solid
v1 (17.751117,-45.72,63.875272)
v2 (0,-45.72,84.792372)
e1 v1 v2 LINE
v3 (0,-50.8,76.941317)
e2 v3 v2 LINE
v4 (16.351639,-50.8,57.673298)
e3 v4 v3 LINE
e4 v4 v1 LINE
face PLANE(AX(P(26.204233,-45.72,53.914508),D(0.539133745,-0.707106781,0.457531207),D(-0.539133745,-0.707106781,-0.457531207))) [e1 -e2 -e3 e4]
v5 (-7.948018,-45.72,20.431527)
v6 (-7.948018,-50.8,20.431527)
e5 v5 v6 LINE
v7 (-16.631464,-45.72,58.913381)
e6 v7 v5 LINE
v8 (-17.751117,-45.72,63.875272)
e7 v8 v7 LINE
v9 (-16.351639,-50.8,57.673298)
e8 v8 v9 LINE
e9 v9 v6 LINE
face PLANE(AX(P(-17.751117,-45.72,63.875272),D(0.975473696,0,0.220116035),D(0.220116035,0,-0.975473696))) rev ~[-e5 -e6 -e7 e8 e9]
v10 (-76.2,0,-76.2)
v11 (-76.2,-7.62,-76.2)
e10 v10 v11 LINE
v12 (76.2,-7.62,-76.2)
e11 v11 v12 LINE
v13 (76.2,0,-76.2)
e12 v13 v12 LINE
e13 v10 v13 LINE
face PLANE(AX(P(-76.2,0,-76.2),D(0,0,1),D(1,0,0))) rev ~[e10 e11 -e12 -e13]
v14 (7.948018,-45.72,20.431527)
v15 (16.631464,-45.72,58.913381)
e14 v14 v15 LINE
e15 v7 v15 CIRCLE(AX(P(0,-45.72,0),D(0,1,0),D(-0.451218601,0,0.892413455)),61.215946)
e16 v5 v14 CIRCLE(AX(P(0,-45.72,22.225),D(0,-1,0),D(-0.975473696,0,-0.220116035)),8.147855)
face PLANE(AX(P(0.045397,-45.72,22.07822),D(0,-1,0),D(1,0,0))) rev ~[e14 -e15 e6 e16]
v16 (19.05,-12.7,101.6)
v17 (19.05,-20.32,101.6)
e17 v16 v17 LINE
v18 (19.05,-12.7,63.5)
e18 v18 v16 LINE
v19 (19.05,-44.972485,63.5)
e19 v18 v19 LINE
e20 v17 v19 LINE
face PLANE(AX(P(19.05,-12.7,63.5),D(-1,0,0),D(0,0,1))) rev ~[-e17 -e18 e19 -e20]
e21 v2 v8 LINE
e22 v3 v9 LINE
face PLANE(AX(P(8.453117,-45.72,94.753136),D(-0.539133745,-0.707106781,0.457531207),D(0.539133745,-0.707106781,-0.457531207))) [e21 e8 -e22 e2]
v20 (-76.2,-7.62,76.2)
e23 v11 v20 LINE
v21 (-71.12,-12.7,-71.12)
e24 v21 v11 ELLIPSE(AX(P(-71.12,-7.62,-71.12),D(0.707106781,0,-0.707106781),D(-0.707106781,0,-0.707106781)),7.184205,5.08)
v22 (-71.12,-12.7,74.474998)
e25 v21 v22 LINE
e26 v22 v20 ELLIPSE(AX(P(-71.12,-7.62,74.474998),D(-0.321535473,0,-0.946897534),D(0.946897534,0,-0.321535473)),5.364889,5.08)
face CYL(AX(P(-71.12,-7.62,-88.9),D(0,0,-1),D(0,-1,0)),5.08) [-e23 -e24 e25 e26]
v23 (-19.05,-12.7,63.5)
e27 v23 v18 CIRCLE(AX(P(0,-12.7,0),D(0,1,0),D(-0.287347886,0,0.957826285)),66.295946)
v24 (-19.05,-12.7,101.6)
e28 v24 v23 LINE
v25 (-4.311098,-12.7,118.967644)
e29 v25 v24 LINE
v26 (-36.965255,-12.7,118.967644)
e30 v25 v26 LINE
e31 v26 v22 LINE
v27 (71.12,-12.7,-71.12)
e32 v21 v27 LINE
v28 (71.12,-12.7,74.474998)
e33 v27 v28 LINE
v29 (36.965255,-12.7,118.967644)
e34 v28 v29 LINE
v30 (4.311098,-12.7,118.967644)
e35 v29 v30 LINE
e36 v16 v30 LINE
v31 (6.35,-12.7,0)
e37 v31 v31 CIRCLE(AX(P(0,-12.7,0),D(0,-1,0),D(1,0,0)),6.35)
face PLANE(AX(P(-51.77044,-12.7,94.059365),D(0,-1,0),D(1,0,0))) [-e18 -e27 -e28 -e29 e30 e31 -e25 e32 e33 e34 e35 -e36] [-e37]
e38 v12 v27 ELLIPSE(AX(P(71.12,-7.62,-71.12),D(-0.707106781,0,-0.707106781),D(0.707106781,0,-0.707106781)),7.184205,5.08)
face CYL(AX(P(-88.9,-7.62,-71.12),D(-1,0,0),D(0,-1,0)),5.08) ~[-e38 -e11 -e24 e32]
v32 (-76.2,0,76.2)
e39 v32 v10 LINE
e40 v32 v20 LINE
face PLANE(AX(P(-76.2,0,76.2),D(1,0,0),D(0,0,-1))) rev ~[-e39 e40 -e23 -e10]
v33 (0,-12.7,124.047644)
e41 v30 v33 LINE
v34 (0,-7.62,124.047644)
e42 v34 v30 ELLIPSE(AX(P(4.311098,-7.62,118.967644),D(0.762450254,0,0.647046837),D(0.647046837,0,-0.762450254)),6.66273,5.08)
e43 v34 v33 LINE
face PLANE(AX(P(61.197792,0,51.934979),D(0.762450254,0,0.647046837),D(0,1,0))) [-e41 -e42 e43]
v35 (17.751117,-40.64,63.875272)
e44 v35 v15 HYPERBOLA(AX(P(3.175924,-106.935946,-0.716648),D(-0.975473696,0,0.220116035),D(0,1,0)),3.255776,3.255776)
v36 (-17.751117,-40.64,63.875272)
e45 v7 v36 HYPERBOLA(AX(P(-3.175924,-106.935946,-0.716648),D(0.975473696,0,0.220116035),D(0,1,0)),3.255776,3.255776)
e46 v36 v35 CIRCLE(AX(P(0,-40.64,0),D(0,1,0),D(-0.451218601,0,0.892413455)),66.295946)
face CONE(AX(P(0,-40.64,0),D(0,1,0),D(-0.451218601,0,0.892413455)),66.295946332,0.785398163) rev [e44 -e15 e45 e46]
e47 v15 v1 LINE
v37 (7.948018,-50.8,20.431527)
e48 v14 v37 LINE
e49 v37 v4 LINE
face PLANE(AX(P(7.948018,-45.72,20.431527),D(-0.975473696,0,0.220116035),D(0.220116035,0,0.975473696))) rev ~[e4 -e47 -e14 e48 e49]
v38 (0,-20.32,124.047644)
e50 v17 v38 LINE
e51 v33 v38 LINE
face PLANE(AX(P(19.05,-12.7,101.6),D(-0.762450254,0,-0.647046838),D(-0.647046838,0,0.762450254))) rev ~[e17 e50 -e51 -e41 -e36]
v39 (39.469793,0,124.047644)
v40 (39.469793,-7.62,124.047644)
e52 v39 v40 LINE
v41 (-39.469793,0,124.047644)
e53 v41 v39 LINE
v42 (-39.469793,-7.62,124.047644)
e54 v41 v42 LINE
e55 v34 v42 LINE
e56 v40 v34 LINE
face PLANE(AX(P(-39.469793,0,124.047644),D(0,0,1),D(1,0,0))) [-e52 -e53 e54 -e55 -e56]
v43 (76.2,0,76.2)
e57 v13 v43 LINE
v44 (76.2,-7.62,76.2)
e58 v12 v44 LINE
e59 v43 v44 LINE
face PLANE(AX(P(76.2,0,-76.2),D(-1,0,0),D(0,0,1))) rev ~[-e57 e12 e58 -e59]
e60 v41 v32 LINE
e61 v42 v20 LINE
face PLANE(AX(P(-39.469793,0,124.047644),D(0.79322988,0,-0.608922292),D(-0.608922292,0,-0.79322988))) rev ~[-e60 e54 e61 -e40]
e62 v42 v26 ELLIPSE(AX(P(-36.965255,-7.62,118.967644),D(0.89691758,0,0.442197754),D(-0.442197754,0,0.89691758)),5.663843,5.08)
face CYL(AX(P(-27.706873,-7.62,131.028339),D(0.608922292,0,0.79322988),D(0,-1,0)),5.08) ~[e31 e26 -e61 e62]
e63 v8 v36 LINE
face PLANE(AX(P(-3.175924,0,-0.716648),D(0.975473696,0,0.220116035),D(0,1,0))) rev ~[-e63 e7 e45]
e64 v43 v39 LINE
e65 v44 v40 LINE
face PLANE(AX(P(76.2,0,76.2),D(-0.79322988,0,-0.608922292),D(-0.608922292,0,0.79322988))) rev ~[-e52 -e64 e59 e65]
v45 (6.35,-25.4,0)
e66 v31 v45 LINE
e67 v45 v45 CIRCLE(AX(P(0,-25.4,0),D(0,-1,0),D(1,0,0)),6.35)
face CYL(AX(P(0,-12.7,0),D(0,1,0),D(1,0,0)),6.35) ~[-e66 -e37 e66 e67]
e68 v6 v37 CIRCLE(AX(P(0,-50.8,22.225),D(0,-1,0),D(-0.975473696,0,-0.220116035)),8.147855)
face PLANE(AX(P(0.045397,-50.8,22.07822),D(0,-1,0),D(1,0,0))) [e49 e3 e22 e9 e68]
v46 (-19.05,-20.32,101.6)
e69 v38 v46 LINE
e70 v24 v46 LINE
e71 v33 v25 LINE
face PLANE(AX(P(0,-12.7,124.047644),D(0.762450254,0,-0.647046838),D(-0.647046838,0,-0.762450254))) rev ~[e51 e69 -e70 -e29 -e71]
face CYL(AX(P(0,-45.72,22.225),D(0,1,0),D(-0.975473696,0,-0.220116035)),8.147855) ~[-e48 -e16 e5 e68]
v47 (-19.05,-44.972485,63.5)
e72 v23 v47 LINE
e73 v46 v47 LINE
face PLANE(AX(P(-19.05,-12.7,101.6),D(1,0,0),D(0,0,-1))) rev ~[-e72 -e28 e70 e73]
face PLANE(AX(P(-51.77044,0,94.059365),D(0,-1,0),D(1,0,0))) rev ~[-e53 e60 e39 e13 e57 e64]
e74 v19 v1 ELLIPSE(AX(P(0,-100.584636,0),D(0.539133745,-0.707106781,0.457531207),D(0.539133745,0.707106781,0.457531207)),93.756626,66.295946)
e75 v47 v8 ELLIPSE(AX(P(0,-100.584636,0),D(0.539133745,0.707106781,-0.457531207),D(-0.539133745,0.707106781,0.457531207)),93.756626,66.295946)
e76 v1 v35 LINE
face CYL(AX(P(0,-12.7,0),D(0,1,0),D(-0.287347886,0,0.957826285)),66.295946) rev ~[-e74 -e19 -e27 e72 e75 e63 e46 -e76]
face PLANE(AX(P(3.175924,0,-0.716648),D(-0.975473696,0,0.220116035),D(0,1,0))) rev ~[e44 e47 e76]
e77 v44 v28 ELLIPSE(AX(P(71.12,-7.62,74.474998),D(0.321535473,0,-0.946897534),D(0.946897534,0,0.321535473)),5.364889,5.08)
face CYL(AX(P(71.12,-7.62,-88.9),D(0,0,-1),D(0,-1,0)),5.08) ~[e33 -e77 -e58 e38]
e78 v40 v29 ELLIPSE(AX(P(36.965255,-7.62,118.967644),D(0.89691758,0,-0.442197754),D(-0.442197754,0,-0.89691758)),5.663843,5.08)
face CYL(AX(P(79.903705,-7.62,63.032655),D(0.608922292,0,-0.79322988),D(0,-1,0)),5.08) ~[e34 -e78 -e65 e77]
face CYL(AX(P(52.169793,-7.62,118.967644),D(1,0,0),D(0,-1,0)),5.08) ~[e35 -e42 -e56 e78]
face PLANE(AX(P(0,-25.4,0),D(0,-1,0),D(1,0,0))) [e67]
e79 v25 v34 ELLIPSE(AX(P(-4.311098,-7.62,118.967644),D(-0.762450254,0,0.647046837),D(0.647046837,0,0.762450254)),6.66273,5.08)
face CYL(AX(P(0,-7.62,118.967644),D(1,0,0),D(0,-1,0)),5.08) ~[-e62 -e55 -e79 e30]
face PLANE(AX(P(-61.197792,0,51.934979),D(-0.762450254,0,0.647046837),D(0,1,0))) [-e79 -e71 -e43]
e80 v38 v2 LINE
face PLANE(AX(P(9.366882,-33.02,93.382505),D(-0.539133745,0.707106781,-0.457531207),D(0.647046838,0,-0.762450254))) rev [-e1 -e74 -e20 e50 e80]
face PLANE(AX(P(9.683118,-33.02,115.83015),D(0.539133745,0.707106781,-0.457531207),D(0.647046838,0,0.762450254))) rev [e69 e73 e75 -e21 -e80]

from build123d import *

# Parameters (mm, degrees)
F0_W          = 78.9395868778
F0_H          = 47.8476444364
F1_DEPTH      = 12.7
F2_R          = 6.35
F3_DEPTH      = 12.7
F5_DEPTH      = 33.02
F6_SIZE       = 25.4
F8_DEPTH      = 5.08
F9_T4_ANGLE   = 53.6437900891
F9_T7_DEPTH   = 53.5623511666
F9_T9_DEPTH   = 53.5623511666
F10_T1_DEPTH  = 85.7200228127
F10_T3_DEPTH  = 177.8
F10_T5_DEPTH  = 85.7200228127
F10_T7_DEPTH  = 177.8
F10_T12_DEPTH = 52.1697934389
F10_T17_DEPTH = 52.1697934389


# Not quite as in the source:
# - a fillet or chamfer that OpenCascade refuses, or shapes differently, is made with other operations: its cross-section is extruded or revolved along the edge and cut away or added


with BuildPart() as f1:
    # F0 (on Front) → F1 (new body)
    with BuildSketch(Plane.XZ):
        Polygon((-39.4697934389, 124.0476444364), (-76.2, 76.2), (-39.4697934389, 76.2), align=None)
        Polygon((-39.4697934389, 76.2), (-76.2, 76.2), (-76.2, -76.2), (76.2, -76.2), (76.2, 76.2), (39.4697934389, 76.2), (39.4697934389, 28.3523555636), (-39.4697934389, 28.3523555636), align=None)
        with Locations((0, 100.1238222182)):
            Rectangle(F0_W, F0_H)
        Polygon((39.4697934389, 124.0476444364), (39.4697934389, 76.2), (76.2, 76.2), align=None)
        with Locations((0, 52.2761777818)):
            Rectangle(F0_W, F0_H)
    extrude(amount=F1_DEPTH)

    # F2 (on face) → F3 (join)
    with BuildSketch(Plane.XZ.offset(12.7)):
        Circle(F2_R)
    extrude(amount=F3_DEPTH)

    # F4 (on face) → F5 (join)
    with BuildSketch(Plane.XZ.offset(12.7)):
        Polygon((0, 124.0476444364), (-19.05, 101.6), (19.05, 101.6), align=None)
        with BuildLine():
            Line((19.05, 101.6), (-19.05, 101.6))
            Line((-19.05, 101.6), (-19.05, 63.5))
            ThreePointArc((-19.05, 63.5), (0, 66.2959463316), (19.05, 63.5))
            Line((19.05, 63.5), (19.05, 101.6))
        make_face()
    extrude(amount=F5_DEPTH)

    # F6
    f6_edges = [f1.edges().sort_by_distance(p)[0] for p in [
        (9.525, -45.72, 112.823822),
        (-9.525, -45.72, 112.823822),
    ]]
    chamfer(f6_edges, length=F6_SIZE)

    # F7 (on face) → F8 (join)
    with BuildSketch(Plane.XZ.offset(45.72)):
        with BuildLine():
            ThreePointArc((7.9480178428, 20.4315265516), (8.0977413026, 21.3227137731), (8.1478546035, 22.225))
            ThreePointArc((8.1478546035, 22.225), (-0.9022862269, 30.3227413026), (-7.9480178428, 20.4315265516))
            ThreePointArc((-7.9480178428, 20.4315265516), (0, 14.0771453965), (7.9480178428, 20.4315265516))
        make_face()
        with BuildLine():
            ThreePointArc((-7.9480178428, 20.4315265516), (-0.9022862269, 30.3227413026), (8.1478546035, 22.225))
            ThreePointArc((8.1478546035, 22.225), (8.0977413026, 21.3227137731), (7.9480178428, 20.4315265516))
            Line((7.9480178428, 20.4315265516), (17.7511165922, 63.8752718956))
            ThreePointArc((17.7511165922, 63.8752718956), (0, 66.2959463316), (-17.7511165922, 63.8752718956))
            Line((-17.7511165922, 63.8752718956), (-7.9480178428, 20.4315265516))
        make_face()
        with BuildLine():
            Line((0, 84.7923718226), (-17.7511165922, 63.8752718956))
            ThreePointArc((-17.7511165922, 63.8752718956), (0, 66.2959463316), (17.7511165922, 63.8752718956))
            Line((17.7511165922, 63.8752718956), (0, 84.7923718226))
        make_face()
    extrude(amount=F8_DEPTH)

    # F9: chamfer of 5.08 on 3 edges, made by hand


with BuildPart() as f9_tool2:
    # F9_s3 → F9_t4 (revolve)
    with BuildSketch(Plane(origin=(0, 0, 0), x_dir=(0, 1, 0), z_dir=(-0.8924134547, 0, -0.4512186011))):
        Polygon((-40.64, -66.2959463316), (-45.72, -61.2159463316), (-45.72, -66.2959463316), align=None)
    revolve(axis=Axis((0, -45.72, 0), (0, 1, 0)), revolution_arc=F9_T4_ANGLE)

    split(bisect_by=Plane(origin=(-3.1759235814, 0, -0.7166484437), x_dir=(0, 1, 0), z_dir=(0.9754736958, 0, 0.2201160349)), keep=Keep.TOP)

    split(bisect_by=Plane(origin=(3.1759235814, 0, -0.7166484437), x_dir=(0, 1, 0), z_dir=(-0.9754736958, 0, 0.2201160349)), keep=Keep.TOP)


with BuildPart() as f1_1:
    add(f1.part)

    # F9_t1: union F9_tool2
    add(f9_tool2.part)

    # F9_s8 → F9_t7 (cut)
    with BuildSketch(Plane(origin=(50.284672357, 0, 59.2531467543), x_dir=(0, 1, 0), z_dir=(-0.6470468375, 0, -0.7624502542))):
        Polygon((-45.72, -54.864636032), (-50.8, -49.784636032), (-50.8, -54.864636032), align=None)
    extrude(amount=F9_T7_DEPTH, mode=Mode.SUBTRACT)

    # F9_s10 → F9_t9 (cut)
    with BuildSketch(Plane(origin=(-15.6273224256, 0, 18.4145184935), x_dir=(0, 1, 0), z_dir=(-0.6470468375, 0, 0.7624502542))):
        Polygon((-45.72, -54.864636032), (-50.8, -49.784636032), (-50.8, -54.864636032), align=None)
    extrude(amount=F9_T9_DEPTH, mode=Mode.SUBTRACT)

    # F10: fillet of radius 5.08 on 7 edges, made by hand

    # F10_s2 → F10_t1 (cut)
    with BuildSketch(Plane(origin=(-0.8185365807, 0, 1.0662898725), x_dir=(0, 1, 0), z_dir=(-0.6089222923, 0, 0.7932298797))):
        with BuildLine():
            ThreePointArc((-12.7, -101.7639955007), (-11.2121024484, -105.3560979491), (-7.62, -106.8439955007))
            Line((-7.62, -106.8439955007), (-12.7, -106.8439955007))
            Line((-12.7, -106.8439955007), (-12.7, -101.7639955007))
        make_face()
    extrude(amount=F10_T1_DEPTH, mode=Mode.SUBTRACT)

    # F10_s4 → F10_t3 (cut)
    with BuildSketch(Plane.XY.offset(-88.9)):
        with BuildLine():
            ThreePointArc((71.12, -12.7), (74.7121024484, -11.2121024484), (76.2, -7.62))
            Line((76.2, -7.62), (76.2, -12.7))
            Line((76.2, -12.7), (71.12, -12.7))
        make_face()
        with BuildLine():
            ThreePointArc((-71.12, -12.7), (-74.7121024484, -11.2121024484), (-76.2, -7.62))
            Line((-76.2, -7.62), (-76.2, -12.7))
            Line((-76.2, -12.7), (-71.12, -12.7))
        make_face()
    extrude(amount=F10_T3_DEPTH, mode=Mode.SUBTRACT)

    # F10_s6 → F10_t5 (cut)
    with BuildSketch(Plane(origin=(53.0153693655, 0, 69.0619732521), x_dir=(0, 1, 0), z_dir=(-0.6089222923, 0, -0.7932298797))):
        with BuildLine():
            ThreePointArc((-12.7, -101.7639955007), (-11.2121024484, -105.3560979491), (-7.62, -106.8439955007))
            Line((-7.62, -106.8439955007), (-12.7, -106.8439955007))
            Line((-12.7, -106.8439955007), (-12.7, -101.7639955007))
        make_face()
    extrude(amount=F10_T5_DEPTH, mode=Mode.SUBTRACT)

    # F10_s8 → F10_t7 (cut)
    with BuildSketch(Plane.YZ.offset(-88.9)):
        with BuildLine():
            ThreePointArc((-12.7, -71.12), (-11.2121024484, -74.7121024484), (-7.62, -76.2))
            Line((-7.62, -76.2), (-12.7, -76.2))
            Line((-12.7, -76.2), (-12.7, -71.12))
        make_face()
    extrude(amount=F10_T7_DEPTH, mode=Mode.SUBTRACT)


with BuildPart() as f10_tool10:
    # F10_s11 → F10_t12 (new body)
    with BuildSketch(Plane.YZ.offset(52.1697934389)):
        with BuildLine():
            ThreePointArc((-12.7, 118.9676444364), (-11.2121024484, 122.5597468848), (-7.62, 124.0476444364))
            Line((-7.62, 124.0476444364), (-12.7, 124.0476444364))
            Line((-12.7, 124.0476444364), (-12.7, 118.9676444364))
        make_face()
    extrude(amount=-F10_T12_DEPTH)

    split(bisect_by=Plane(origin=(61.1977921432, 0, 51.9349789077), x_dir=(0, 1, 0), z_dir=(0.7624502542, 0, 0.6470468375)), keep=Keep.TOP)


with BuildPart() as f1_2:
    add(f1_1.part)

    # F10_t9: cut F10_tool10
    add(f10_tool10.part, mode=Mode.SUBTRACT)


with BuildPart() as f10_tool15:
    # F10_s16 → F10_t17 (new body)
    with BuildSketch(Plane.YZ):
        with BuildLine():
            ThreePointArc((-12.7, 118.9676444364), (-11.2121024484, 122.5597468848), (-7.62, 124.0476444364))
            Line((-7.62, 124.0476444364), (-12.7, 124.0476444364))
            Line((-12.7, 124.0476444364), (-12.7, 118.9676444364))
        make_face()
    extrude(amount=-F10_T17_DEPTH)

    split(bisect_by=Plane(origin=(-61.1977921432, 0, 51.9349789077), x_dir=(0, 1, 0), z_dir=(-0.7624502542, 0, 0.6470468375)), keep=Keep.TOP)


with BuildPart() as f1_3:
    add(f1_2.part)

    # F10_t14: cut F10_tool15
    add(f10_tool15.part, mode=Mode.SUBTRACT)


solid = f1_3.part
